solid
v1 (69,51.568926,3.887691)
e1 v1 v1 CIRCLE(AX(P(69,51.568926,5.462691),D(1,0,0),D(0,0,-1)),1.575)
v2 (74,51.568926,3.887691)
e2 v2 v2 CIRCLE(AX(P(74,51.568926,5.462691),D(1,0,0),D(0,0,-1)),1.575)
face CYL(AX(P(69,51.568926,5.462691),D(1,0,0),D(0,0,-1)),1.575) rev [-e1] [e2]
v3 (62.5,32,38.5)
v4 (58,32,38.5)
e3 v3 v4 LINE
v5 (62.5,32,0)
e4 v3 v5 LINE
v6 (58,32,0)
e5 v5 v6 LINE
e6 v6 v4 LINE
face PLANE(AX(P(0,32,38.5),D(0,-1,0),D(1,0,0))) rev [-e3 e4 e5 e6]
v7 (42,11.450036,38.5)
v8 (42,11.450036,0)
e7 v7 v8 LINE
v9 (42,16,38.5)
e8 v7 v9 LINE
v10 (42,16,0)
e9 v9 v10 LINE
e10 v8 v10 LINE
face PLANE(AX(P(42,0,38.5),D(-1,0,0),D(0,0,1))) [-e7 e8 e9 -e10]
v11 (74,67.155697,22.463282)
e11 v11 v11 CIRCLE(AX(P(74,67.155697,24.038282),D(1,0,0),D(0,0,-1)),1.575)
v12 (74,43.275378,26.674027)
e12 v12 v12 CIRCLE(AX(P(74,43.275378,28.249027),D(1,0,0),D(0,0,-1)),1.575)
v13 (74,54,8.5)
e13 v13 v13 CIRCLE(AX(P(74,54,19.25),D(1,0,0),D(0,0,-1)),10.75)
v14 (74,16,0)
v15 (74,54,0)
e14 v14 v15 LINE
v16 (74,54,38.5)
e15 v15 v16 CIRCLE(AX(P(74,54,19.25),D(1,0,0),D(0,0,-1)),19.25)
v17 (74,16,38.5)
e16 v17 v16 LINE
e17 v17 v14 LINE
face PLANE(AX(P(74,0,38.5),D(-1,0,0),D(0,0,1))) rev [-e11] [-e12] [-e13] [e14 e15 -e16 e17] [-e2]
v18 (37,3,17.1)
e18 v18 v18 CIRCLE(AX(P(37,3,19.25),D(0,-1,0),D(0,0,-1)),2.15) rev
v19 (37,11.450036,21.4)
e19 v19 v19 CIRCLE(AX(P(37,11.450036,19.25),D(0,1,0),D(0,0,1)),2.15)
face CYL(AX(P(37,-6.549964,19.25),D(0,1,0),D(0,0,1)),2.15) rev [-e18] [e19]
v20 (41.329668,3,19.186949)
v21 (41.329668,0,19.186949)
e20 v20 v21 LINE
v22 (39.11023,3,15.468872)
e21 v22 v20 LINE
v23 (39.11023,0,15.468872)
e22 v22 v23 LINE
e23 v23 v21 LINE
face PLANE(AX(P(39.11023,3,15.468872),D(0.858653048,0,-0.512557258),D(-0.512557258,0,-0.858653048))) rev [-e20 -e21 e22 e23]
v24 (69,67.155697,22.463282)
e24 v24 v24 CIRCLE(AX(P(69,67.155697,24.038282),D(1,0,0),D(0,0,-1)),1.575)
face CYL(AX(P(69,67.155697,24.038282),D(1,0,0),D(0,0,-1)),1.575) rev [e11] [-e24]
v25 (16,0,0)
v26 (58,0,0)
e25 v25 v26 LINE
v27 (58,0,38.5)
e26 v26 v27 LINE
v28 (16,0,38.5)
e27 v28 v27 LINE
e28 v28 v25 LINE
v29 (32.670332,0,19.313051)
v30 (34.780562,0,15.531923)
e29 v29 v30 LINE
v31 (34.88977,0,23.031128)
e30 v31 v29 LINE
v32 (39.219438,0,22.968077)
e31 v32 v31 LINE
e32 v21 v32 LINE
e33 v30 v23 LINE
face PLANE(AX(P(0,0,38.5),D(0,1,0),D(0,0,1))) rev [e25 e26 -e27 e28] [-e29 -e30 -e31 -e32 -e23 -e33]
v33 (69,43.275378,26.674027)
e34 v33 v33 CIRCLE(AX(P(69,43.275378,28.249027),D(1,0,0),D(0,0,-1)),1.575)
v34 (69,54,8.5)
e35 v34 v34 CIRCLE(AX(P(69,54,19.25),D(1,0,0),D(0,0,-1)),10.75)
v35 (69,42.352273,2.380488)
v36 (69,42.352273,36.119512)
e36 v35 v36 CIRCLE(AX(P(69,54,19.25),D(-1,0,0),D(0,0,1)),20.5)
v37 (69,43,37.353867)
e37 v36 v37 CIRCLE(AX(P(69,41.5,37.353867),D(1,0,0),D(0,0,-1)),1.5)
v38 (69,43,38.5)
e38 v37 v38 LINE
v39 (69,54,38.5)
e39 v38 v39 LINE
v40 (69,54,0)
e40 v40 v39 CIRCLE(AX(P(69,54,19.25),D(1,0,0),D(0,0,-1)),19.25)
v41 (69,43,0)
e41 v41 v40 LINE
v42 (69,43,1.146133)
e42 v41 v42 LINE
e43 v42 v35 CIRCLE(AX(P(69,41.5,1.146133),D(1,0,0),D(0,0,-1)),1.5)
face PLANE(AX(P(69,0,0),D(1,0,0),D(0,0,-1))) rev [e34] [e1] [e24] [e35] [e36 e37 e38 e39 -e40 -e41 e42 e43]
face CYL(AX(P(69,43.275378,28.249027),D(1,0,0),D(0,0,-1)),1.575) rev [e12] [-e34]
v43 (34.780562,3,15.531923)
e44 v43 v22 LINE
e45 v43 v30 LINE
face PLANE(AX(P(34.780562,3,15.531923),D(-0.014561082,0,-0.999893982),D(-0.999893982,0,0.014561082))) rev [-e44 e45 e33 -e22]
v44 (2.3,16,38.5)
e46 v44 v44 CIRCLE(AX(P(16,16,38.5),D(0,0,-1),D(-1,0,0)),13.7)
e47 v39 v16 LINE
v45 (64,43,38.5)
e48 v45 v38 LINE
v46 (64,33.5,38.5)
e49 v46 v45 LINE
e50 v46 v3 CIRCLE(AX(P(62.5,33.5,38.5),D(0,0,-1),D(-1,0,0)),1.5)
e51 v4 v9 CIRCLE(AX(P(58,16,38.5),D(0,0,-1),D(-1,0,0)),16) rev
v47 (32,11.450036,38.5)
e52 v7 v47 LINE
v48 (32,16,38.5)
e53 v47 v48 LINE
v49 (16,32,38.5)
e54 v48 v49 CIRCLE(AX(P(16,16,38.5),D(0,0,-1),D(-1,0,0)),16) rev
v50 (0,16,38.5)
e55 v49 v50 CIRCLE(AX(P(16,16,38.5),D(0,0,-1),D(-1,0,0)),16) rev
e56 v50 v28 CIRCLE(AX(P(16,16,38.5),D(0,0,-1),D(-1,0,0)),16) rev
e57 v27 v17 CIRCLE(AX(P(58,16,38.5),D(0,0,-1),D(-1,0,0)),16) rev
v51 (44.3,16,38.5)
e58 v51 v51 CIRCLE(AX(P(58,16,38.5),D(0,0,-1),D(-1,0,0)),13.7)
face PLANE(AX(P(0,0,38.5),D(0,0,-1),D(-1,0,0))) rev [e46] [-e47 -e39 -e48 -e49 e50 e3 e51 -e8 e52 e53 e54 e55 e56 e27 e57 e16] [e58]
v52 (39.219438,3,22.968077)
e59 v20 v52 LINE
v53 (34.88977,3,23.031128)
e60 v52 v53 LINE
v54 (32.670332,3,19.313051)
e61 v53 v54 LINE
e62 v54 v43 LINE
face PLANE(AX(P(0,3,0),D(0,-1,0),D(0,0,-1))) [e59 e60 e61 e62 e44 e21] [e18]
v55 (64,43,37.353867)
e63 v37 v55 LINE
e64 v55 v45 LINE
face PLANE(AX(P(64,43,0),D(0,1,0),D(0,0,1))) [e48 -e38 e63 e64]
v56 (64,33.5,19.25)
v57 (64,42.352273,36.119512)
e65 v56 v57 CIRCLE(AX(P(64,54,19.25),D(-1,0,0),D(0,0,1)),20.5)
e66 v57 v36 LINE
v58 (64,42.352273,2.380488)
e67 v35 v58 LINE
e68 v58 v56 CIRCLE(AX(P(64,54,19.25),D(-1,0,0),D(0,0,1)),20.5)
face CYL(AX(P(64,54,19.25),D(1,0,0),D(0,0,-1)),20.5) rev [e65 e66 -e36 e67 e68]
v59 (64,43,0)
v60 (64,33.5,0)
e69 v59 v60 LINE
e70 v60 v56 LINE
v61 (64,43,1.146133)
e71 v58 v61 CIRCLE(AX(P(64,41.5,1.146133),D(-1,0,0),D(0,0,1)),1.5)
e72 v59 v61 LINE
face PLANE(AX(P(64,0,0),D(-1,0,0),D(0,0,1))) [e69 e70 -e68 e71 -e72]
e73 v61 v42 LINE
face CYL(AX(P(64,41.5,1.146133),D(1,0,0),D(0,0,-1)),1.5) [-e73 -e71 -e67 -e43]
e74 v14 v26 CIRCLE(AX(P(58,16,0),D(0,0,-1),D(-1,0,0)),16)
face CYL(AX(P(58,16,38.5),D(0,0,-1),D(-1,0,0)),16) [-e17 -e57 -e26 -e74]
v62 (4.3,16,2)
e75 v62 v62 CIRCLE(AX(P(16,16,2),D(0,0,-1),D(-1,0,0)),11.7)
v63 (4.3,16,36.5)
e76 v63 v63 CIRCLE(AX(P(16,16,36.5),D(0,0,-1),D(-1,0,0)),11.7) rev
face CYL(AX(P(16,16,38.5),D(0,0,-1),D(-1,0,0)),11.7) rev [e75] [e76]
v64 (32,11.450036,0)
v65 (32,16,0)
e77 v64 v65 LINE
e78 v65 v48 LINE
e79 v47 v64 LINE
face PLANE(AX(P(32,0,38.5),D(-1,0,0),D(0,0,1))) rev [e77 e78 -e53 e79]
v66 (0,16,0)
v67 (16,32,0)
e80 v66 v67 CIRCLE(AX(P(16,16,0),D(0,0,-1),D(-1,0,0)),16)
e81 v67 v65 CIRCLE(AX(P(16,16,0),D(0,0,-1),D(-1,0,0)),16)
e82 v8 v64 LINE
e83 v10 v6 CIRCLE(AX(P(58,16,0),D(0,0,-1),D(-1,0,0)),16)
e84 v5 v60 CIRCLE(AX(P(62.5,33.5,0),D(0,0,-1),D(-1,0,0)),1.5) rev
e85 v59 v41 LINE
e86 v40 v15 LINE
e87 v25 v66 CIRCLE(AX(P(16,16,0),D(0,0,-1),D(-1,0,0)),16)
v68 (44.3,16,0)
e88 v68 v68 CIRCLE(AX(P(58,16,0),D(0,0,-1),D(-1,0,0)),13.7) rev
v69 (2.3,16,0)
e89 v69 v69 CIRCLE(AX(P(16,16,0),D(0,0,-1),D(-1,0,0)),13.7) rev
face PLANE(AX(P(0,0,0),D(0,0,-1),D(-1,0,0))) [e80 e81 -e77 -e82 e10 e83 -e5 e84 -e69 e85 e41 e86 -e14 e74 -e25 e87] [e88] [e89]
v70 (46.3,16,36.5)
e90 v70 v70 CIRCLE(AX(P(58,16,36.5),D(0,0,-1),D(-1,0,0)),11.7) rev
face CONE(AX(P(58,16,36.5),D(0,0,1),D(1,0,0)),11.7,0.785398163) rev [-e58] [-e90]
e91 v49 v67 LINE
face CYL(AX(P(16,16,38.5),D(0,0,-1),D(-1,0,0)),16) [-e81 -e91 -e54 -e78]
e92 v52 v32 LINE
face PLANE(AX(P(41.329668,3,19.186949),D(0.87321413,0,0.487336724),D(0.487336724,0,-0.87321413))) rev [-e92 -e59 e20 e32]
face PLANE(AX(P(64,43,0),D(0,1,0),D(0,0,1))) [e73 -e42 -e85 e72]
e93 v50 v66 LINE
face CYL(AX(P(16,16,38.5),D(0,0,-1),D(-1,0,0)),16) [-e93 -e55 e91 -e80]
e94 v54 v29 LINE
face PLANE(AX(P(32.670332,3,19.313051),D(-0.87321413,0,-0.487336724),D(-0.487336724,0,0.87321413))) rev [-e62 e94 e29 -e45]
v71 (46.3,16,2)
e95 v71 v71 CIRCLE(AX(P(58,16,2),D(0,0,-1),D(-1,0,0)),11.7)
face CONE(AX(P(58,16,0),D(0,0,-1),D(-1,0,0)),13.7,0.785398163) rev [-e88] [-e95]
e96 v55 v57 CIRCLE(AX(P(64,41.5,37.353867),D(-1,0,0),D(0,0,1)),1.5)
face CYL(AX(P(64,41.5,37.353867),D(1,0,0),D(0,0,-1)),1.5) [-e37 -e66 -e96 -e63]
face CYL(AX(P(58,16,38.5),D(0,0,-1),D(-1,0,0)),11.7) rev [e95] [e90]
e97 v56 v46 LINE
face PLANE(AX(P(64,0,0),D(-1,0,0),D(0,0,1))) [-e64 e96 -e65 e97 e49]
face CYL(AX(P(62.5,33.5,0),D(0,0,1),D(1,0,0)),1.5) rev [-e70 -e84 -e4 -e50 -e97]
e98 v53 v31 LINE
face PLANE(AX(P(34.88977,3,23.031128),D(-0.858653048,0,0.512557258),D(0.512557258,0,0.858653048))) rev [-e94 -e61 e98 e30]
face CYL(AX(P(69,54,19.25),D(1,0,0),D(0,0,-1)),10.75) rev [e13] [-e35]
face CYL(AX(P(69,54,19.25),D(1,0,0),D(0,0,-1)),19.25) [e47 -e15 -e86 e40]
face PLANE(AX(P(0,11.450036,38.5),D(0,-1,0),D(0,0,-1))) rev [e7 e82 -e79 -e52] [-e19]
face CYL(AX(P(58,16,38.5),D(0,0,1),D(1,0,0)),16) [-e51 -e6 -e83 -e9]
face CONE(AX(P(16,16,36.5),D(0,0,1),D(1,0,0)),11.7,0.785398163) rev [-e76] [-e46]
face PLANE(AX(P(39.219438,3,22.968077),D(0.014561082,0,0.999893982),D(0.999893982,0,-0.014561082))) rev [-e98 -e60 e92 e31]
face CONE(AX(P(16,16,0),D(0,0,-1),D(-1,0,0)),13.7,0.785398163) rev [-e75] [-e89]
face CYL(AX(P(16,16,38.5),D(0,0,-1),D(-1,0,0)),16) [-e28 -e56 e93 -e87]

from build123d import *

# Parameters (mm, degrees)
SKETCH1_W               = 74
SKETCH1_H               = 32
SKETCH1_R               = 11.7
BOSS_EXTRUDE1_DEPTH     = 38.5
SKETCH2_R               = 1.575
SKETCH2_R_2             = 10.75
BOSS_EXTRUDE2_DEPTH     = 5
BOSS_EXTRUDE3_DEPTH     = 5
CUT_EXTRUDE1_DEPTH      = 112.012668196
CUT_EXTRUDE1_DEPTH_BACK = 112.012668196
SKETCH4_W               = 10
SKETCH4_H               = 25
SKETCH4_H_2             = 4.450035805
SKETCH5_R               = 2.15
CUT_EXTRUDE2_DEPTH      = 18
FILLET8_R               = 16
FILLET9_R               = 1.5
FILLET10_SIZE           = 2
CUT_EXTRUDE3_DEPTH      = 3


with BuildPart() as part:
    # Sketch1 → Boss-Extrude1 (new body)
    with BuildSketch(Plane.XY):
        with Locations((37, 16)):
            Rectangle(SKETCH1_W, SKETCH1_H)
        with Locations((16, 16)):
            Circle(SKETCH1_R, mode=Mode.SUBTRACT)
        with Locations((58, 16)):
            Circle(SKETCH1_R, mode=Mode.SUBTRACT)
    extrude(amount=BOSS_EXTRUDE1_DEPTH)

    # Sketch2 → Boss-Extrude2 (add)
    # profile 1 of 2: a face of its own
    with BuildSketch(Plane(origin=(74, 0, 0), x_dir=(0, 0, -1), z_dir=(1, 0, 0))):
        with BuildLine():
            Line((-38.5, 32), (0, 32))
            Line((0, 32), (0, 54))
            ThreePointArc((0, 54), (-19.25, 34.75), (-38.5, 54))
            Line((-38.5, 54), (-38.5, 32))
        make_face()
    # profile 2 of 2: a face of its own
    with BuildSketch(Plane(origin=(74, 0, 0), x_dir=(0, 0, -1), z_dir=(1, 0, 0))):
        with BuildLine():
            ThreePointArc((-38.5, 54), (-19.25, 34.75), (0, 54))
            ThreePointArc((0, 54), (-19.25, 73.25), (-38.5, 54))
        make_face()
        with Locations((-28.249026536, 43.275377796)):
            Circle(SKETCH2_R, mode=Mode.SUBTRACT)
        with Locations((-24.038282007, 67.155696691)):
            Circle(SKETCH2_R, mode=Mode.SUBTRACT)
        with Locations((-19.25, 54)):
            Circle(SKETCH2_R_2, mode=Mode.SUBTRACT)
        with Locations((-5.462691458, 51.568925513)):
            Circle(SKETCH2_R, mode=Mode.SUBTRACT)
    extrude(amount=-BOSS_EXTRUDE2_DEPTH)

    # Sketch3 → Boss-Extrude3 (add)
    with BuildSketch(Plane.ZY.offset(-69)):
        with BuildLine():
            Line((0, 43), (0, 32))
            Line((0, 32), (38.5, 32))
            Line((38.5, 32), (38.5, 43))
            Line((38.5, 43), (36.548843892, 43))
            ThreePointArc((36.548843892, 43), (19.25, 33.5), (1.951156108, 43))
            Line((1.951156108, 43), (0, 43))
        make_face()
    extrude(amount=BOSS_EXTRUDE3_DEPTH)

    # Sketch4 → Cut-Extrude1 (cut, two sides: drawn at the far end of the back side and taken through both)
    with BuildSketch(Plane(origin=(0, 0, 0), x_dir=(-1, 0, 0), z_dir=(0, 0, -1)).offset(-CUT_EXTRUDE1_DEPTH_BACK)):
        with Locations((-37, 23.950035805)):
            Rectangle(SKETCH4_W, SKETCH4_H)
        with Locations((-37, 34.225017902)):
            Rectangle(SKETCH4_W, SKETCH4_H_2)
    extrude(amount=CUT_EXTRUDE1_DEPTH + CUT_EXTRUDE1_DEPTH_BACK, mode=Mode.SUBTRACT)

    # Sketch5 → Cut-Extrude2 (cut)
    with BuildSketch(Plane(origin=(0, 11.450035805, 0), x_dir=(1, 0, 0), z_dir=(0, 1, 0))):
        with Locations(Location((37, -19.25, 0), (0, 0, 270))):
            Circle(SKETCH5_R)
    extrude(amount=-CUT_EXTRUDE2_DEPTH, mode=Mode.SUBTRACT)

    # Fillet8
    fillet8_edges = [part.edges().sort_by_distance(p)[0] for p in [
        (42, 32, 19.25),
        (32, 32, 19.25),
        (0, 32, 19.25),
        (0, 0, 19.25),
        (74, 0, 19.25),
    ]]
    fillet(fillet8_edges, radius=FILLET8_R - 0.0001)  # a hair under: the kernel refuses the full size

    # Fillet9
    fillet9_edges = [part.edges().sort_by_distance(p)[0] for p in [
        (66.5, 43, 36.548843892),
        (66.5, 43, 1.951156108),
        (64, 32, 19.25),
    ]]
    fillet(fillet9_edges, radius=FILLET9_R - 0.0001)  # a hair under: the kernel refuses the full size

    # Fillet10
    fillet10_edges = [part.edges().sort_by_distance(p)[0] for p in [
        (4.3, 16, 0),
        (4.3, 16, 38.5),
        (46.3, 16, 0),
        (46.3, 16, 38.5),
    ]]
    chamfer(fillet10_edges, length=FILLET10_SIZE)

    # Sketch6 → Cut-Extrude3 (cut)
    with BuildSketch(Plane.XZ):
        Polygon((39.110229916, 15.468871901), (41.329667947, 19.186948665), (39.219438031, 22.968076764), (34.889770084, 23.031128099), (32.670332053, 19.313051335), (34.780561969, 15.531923236), align=None)
    extrude(amount=-CUT_EXTRUDE3_DEPTH, mode=Mode.SUBTRACT)


solid = part.part
